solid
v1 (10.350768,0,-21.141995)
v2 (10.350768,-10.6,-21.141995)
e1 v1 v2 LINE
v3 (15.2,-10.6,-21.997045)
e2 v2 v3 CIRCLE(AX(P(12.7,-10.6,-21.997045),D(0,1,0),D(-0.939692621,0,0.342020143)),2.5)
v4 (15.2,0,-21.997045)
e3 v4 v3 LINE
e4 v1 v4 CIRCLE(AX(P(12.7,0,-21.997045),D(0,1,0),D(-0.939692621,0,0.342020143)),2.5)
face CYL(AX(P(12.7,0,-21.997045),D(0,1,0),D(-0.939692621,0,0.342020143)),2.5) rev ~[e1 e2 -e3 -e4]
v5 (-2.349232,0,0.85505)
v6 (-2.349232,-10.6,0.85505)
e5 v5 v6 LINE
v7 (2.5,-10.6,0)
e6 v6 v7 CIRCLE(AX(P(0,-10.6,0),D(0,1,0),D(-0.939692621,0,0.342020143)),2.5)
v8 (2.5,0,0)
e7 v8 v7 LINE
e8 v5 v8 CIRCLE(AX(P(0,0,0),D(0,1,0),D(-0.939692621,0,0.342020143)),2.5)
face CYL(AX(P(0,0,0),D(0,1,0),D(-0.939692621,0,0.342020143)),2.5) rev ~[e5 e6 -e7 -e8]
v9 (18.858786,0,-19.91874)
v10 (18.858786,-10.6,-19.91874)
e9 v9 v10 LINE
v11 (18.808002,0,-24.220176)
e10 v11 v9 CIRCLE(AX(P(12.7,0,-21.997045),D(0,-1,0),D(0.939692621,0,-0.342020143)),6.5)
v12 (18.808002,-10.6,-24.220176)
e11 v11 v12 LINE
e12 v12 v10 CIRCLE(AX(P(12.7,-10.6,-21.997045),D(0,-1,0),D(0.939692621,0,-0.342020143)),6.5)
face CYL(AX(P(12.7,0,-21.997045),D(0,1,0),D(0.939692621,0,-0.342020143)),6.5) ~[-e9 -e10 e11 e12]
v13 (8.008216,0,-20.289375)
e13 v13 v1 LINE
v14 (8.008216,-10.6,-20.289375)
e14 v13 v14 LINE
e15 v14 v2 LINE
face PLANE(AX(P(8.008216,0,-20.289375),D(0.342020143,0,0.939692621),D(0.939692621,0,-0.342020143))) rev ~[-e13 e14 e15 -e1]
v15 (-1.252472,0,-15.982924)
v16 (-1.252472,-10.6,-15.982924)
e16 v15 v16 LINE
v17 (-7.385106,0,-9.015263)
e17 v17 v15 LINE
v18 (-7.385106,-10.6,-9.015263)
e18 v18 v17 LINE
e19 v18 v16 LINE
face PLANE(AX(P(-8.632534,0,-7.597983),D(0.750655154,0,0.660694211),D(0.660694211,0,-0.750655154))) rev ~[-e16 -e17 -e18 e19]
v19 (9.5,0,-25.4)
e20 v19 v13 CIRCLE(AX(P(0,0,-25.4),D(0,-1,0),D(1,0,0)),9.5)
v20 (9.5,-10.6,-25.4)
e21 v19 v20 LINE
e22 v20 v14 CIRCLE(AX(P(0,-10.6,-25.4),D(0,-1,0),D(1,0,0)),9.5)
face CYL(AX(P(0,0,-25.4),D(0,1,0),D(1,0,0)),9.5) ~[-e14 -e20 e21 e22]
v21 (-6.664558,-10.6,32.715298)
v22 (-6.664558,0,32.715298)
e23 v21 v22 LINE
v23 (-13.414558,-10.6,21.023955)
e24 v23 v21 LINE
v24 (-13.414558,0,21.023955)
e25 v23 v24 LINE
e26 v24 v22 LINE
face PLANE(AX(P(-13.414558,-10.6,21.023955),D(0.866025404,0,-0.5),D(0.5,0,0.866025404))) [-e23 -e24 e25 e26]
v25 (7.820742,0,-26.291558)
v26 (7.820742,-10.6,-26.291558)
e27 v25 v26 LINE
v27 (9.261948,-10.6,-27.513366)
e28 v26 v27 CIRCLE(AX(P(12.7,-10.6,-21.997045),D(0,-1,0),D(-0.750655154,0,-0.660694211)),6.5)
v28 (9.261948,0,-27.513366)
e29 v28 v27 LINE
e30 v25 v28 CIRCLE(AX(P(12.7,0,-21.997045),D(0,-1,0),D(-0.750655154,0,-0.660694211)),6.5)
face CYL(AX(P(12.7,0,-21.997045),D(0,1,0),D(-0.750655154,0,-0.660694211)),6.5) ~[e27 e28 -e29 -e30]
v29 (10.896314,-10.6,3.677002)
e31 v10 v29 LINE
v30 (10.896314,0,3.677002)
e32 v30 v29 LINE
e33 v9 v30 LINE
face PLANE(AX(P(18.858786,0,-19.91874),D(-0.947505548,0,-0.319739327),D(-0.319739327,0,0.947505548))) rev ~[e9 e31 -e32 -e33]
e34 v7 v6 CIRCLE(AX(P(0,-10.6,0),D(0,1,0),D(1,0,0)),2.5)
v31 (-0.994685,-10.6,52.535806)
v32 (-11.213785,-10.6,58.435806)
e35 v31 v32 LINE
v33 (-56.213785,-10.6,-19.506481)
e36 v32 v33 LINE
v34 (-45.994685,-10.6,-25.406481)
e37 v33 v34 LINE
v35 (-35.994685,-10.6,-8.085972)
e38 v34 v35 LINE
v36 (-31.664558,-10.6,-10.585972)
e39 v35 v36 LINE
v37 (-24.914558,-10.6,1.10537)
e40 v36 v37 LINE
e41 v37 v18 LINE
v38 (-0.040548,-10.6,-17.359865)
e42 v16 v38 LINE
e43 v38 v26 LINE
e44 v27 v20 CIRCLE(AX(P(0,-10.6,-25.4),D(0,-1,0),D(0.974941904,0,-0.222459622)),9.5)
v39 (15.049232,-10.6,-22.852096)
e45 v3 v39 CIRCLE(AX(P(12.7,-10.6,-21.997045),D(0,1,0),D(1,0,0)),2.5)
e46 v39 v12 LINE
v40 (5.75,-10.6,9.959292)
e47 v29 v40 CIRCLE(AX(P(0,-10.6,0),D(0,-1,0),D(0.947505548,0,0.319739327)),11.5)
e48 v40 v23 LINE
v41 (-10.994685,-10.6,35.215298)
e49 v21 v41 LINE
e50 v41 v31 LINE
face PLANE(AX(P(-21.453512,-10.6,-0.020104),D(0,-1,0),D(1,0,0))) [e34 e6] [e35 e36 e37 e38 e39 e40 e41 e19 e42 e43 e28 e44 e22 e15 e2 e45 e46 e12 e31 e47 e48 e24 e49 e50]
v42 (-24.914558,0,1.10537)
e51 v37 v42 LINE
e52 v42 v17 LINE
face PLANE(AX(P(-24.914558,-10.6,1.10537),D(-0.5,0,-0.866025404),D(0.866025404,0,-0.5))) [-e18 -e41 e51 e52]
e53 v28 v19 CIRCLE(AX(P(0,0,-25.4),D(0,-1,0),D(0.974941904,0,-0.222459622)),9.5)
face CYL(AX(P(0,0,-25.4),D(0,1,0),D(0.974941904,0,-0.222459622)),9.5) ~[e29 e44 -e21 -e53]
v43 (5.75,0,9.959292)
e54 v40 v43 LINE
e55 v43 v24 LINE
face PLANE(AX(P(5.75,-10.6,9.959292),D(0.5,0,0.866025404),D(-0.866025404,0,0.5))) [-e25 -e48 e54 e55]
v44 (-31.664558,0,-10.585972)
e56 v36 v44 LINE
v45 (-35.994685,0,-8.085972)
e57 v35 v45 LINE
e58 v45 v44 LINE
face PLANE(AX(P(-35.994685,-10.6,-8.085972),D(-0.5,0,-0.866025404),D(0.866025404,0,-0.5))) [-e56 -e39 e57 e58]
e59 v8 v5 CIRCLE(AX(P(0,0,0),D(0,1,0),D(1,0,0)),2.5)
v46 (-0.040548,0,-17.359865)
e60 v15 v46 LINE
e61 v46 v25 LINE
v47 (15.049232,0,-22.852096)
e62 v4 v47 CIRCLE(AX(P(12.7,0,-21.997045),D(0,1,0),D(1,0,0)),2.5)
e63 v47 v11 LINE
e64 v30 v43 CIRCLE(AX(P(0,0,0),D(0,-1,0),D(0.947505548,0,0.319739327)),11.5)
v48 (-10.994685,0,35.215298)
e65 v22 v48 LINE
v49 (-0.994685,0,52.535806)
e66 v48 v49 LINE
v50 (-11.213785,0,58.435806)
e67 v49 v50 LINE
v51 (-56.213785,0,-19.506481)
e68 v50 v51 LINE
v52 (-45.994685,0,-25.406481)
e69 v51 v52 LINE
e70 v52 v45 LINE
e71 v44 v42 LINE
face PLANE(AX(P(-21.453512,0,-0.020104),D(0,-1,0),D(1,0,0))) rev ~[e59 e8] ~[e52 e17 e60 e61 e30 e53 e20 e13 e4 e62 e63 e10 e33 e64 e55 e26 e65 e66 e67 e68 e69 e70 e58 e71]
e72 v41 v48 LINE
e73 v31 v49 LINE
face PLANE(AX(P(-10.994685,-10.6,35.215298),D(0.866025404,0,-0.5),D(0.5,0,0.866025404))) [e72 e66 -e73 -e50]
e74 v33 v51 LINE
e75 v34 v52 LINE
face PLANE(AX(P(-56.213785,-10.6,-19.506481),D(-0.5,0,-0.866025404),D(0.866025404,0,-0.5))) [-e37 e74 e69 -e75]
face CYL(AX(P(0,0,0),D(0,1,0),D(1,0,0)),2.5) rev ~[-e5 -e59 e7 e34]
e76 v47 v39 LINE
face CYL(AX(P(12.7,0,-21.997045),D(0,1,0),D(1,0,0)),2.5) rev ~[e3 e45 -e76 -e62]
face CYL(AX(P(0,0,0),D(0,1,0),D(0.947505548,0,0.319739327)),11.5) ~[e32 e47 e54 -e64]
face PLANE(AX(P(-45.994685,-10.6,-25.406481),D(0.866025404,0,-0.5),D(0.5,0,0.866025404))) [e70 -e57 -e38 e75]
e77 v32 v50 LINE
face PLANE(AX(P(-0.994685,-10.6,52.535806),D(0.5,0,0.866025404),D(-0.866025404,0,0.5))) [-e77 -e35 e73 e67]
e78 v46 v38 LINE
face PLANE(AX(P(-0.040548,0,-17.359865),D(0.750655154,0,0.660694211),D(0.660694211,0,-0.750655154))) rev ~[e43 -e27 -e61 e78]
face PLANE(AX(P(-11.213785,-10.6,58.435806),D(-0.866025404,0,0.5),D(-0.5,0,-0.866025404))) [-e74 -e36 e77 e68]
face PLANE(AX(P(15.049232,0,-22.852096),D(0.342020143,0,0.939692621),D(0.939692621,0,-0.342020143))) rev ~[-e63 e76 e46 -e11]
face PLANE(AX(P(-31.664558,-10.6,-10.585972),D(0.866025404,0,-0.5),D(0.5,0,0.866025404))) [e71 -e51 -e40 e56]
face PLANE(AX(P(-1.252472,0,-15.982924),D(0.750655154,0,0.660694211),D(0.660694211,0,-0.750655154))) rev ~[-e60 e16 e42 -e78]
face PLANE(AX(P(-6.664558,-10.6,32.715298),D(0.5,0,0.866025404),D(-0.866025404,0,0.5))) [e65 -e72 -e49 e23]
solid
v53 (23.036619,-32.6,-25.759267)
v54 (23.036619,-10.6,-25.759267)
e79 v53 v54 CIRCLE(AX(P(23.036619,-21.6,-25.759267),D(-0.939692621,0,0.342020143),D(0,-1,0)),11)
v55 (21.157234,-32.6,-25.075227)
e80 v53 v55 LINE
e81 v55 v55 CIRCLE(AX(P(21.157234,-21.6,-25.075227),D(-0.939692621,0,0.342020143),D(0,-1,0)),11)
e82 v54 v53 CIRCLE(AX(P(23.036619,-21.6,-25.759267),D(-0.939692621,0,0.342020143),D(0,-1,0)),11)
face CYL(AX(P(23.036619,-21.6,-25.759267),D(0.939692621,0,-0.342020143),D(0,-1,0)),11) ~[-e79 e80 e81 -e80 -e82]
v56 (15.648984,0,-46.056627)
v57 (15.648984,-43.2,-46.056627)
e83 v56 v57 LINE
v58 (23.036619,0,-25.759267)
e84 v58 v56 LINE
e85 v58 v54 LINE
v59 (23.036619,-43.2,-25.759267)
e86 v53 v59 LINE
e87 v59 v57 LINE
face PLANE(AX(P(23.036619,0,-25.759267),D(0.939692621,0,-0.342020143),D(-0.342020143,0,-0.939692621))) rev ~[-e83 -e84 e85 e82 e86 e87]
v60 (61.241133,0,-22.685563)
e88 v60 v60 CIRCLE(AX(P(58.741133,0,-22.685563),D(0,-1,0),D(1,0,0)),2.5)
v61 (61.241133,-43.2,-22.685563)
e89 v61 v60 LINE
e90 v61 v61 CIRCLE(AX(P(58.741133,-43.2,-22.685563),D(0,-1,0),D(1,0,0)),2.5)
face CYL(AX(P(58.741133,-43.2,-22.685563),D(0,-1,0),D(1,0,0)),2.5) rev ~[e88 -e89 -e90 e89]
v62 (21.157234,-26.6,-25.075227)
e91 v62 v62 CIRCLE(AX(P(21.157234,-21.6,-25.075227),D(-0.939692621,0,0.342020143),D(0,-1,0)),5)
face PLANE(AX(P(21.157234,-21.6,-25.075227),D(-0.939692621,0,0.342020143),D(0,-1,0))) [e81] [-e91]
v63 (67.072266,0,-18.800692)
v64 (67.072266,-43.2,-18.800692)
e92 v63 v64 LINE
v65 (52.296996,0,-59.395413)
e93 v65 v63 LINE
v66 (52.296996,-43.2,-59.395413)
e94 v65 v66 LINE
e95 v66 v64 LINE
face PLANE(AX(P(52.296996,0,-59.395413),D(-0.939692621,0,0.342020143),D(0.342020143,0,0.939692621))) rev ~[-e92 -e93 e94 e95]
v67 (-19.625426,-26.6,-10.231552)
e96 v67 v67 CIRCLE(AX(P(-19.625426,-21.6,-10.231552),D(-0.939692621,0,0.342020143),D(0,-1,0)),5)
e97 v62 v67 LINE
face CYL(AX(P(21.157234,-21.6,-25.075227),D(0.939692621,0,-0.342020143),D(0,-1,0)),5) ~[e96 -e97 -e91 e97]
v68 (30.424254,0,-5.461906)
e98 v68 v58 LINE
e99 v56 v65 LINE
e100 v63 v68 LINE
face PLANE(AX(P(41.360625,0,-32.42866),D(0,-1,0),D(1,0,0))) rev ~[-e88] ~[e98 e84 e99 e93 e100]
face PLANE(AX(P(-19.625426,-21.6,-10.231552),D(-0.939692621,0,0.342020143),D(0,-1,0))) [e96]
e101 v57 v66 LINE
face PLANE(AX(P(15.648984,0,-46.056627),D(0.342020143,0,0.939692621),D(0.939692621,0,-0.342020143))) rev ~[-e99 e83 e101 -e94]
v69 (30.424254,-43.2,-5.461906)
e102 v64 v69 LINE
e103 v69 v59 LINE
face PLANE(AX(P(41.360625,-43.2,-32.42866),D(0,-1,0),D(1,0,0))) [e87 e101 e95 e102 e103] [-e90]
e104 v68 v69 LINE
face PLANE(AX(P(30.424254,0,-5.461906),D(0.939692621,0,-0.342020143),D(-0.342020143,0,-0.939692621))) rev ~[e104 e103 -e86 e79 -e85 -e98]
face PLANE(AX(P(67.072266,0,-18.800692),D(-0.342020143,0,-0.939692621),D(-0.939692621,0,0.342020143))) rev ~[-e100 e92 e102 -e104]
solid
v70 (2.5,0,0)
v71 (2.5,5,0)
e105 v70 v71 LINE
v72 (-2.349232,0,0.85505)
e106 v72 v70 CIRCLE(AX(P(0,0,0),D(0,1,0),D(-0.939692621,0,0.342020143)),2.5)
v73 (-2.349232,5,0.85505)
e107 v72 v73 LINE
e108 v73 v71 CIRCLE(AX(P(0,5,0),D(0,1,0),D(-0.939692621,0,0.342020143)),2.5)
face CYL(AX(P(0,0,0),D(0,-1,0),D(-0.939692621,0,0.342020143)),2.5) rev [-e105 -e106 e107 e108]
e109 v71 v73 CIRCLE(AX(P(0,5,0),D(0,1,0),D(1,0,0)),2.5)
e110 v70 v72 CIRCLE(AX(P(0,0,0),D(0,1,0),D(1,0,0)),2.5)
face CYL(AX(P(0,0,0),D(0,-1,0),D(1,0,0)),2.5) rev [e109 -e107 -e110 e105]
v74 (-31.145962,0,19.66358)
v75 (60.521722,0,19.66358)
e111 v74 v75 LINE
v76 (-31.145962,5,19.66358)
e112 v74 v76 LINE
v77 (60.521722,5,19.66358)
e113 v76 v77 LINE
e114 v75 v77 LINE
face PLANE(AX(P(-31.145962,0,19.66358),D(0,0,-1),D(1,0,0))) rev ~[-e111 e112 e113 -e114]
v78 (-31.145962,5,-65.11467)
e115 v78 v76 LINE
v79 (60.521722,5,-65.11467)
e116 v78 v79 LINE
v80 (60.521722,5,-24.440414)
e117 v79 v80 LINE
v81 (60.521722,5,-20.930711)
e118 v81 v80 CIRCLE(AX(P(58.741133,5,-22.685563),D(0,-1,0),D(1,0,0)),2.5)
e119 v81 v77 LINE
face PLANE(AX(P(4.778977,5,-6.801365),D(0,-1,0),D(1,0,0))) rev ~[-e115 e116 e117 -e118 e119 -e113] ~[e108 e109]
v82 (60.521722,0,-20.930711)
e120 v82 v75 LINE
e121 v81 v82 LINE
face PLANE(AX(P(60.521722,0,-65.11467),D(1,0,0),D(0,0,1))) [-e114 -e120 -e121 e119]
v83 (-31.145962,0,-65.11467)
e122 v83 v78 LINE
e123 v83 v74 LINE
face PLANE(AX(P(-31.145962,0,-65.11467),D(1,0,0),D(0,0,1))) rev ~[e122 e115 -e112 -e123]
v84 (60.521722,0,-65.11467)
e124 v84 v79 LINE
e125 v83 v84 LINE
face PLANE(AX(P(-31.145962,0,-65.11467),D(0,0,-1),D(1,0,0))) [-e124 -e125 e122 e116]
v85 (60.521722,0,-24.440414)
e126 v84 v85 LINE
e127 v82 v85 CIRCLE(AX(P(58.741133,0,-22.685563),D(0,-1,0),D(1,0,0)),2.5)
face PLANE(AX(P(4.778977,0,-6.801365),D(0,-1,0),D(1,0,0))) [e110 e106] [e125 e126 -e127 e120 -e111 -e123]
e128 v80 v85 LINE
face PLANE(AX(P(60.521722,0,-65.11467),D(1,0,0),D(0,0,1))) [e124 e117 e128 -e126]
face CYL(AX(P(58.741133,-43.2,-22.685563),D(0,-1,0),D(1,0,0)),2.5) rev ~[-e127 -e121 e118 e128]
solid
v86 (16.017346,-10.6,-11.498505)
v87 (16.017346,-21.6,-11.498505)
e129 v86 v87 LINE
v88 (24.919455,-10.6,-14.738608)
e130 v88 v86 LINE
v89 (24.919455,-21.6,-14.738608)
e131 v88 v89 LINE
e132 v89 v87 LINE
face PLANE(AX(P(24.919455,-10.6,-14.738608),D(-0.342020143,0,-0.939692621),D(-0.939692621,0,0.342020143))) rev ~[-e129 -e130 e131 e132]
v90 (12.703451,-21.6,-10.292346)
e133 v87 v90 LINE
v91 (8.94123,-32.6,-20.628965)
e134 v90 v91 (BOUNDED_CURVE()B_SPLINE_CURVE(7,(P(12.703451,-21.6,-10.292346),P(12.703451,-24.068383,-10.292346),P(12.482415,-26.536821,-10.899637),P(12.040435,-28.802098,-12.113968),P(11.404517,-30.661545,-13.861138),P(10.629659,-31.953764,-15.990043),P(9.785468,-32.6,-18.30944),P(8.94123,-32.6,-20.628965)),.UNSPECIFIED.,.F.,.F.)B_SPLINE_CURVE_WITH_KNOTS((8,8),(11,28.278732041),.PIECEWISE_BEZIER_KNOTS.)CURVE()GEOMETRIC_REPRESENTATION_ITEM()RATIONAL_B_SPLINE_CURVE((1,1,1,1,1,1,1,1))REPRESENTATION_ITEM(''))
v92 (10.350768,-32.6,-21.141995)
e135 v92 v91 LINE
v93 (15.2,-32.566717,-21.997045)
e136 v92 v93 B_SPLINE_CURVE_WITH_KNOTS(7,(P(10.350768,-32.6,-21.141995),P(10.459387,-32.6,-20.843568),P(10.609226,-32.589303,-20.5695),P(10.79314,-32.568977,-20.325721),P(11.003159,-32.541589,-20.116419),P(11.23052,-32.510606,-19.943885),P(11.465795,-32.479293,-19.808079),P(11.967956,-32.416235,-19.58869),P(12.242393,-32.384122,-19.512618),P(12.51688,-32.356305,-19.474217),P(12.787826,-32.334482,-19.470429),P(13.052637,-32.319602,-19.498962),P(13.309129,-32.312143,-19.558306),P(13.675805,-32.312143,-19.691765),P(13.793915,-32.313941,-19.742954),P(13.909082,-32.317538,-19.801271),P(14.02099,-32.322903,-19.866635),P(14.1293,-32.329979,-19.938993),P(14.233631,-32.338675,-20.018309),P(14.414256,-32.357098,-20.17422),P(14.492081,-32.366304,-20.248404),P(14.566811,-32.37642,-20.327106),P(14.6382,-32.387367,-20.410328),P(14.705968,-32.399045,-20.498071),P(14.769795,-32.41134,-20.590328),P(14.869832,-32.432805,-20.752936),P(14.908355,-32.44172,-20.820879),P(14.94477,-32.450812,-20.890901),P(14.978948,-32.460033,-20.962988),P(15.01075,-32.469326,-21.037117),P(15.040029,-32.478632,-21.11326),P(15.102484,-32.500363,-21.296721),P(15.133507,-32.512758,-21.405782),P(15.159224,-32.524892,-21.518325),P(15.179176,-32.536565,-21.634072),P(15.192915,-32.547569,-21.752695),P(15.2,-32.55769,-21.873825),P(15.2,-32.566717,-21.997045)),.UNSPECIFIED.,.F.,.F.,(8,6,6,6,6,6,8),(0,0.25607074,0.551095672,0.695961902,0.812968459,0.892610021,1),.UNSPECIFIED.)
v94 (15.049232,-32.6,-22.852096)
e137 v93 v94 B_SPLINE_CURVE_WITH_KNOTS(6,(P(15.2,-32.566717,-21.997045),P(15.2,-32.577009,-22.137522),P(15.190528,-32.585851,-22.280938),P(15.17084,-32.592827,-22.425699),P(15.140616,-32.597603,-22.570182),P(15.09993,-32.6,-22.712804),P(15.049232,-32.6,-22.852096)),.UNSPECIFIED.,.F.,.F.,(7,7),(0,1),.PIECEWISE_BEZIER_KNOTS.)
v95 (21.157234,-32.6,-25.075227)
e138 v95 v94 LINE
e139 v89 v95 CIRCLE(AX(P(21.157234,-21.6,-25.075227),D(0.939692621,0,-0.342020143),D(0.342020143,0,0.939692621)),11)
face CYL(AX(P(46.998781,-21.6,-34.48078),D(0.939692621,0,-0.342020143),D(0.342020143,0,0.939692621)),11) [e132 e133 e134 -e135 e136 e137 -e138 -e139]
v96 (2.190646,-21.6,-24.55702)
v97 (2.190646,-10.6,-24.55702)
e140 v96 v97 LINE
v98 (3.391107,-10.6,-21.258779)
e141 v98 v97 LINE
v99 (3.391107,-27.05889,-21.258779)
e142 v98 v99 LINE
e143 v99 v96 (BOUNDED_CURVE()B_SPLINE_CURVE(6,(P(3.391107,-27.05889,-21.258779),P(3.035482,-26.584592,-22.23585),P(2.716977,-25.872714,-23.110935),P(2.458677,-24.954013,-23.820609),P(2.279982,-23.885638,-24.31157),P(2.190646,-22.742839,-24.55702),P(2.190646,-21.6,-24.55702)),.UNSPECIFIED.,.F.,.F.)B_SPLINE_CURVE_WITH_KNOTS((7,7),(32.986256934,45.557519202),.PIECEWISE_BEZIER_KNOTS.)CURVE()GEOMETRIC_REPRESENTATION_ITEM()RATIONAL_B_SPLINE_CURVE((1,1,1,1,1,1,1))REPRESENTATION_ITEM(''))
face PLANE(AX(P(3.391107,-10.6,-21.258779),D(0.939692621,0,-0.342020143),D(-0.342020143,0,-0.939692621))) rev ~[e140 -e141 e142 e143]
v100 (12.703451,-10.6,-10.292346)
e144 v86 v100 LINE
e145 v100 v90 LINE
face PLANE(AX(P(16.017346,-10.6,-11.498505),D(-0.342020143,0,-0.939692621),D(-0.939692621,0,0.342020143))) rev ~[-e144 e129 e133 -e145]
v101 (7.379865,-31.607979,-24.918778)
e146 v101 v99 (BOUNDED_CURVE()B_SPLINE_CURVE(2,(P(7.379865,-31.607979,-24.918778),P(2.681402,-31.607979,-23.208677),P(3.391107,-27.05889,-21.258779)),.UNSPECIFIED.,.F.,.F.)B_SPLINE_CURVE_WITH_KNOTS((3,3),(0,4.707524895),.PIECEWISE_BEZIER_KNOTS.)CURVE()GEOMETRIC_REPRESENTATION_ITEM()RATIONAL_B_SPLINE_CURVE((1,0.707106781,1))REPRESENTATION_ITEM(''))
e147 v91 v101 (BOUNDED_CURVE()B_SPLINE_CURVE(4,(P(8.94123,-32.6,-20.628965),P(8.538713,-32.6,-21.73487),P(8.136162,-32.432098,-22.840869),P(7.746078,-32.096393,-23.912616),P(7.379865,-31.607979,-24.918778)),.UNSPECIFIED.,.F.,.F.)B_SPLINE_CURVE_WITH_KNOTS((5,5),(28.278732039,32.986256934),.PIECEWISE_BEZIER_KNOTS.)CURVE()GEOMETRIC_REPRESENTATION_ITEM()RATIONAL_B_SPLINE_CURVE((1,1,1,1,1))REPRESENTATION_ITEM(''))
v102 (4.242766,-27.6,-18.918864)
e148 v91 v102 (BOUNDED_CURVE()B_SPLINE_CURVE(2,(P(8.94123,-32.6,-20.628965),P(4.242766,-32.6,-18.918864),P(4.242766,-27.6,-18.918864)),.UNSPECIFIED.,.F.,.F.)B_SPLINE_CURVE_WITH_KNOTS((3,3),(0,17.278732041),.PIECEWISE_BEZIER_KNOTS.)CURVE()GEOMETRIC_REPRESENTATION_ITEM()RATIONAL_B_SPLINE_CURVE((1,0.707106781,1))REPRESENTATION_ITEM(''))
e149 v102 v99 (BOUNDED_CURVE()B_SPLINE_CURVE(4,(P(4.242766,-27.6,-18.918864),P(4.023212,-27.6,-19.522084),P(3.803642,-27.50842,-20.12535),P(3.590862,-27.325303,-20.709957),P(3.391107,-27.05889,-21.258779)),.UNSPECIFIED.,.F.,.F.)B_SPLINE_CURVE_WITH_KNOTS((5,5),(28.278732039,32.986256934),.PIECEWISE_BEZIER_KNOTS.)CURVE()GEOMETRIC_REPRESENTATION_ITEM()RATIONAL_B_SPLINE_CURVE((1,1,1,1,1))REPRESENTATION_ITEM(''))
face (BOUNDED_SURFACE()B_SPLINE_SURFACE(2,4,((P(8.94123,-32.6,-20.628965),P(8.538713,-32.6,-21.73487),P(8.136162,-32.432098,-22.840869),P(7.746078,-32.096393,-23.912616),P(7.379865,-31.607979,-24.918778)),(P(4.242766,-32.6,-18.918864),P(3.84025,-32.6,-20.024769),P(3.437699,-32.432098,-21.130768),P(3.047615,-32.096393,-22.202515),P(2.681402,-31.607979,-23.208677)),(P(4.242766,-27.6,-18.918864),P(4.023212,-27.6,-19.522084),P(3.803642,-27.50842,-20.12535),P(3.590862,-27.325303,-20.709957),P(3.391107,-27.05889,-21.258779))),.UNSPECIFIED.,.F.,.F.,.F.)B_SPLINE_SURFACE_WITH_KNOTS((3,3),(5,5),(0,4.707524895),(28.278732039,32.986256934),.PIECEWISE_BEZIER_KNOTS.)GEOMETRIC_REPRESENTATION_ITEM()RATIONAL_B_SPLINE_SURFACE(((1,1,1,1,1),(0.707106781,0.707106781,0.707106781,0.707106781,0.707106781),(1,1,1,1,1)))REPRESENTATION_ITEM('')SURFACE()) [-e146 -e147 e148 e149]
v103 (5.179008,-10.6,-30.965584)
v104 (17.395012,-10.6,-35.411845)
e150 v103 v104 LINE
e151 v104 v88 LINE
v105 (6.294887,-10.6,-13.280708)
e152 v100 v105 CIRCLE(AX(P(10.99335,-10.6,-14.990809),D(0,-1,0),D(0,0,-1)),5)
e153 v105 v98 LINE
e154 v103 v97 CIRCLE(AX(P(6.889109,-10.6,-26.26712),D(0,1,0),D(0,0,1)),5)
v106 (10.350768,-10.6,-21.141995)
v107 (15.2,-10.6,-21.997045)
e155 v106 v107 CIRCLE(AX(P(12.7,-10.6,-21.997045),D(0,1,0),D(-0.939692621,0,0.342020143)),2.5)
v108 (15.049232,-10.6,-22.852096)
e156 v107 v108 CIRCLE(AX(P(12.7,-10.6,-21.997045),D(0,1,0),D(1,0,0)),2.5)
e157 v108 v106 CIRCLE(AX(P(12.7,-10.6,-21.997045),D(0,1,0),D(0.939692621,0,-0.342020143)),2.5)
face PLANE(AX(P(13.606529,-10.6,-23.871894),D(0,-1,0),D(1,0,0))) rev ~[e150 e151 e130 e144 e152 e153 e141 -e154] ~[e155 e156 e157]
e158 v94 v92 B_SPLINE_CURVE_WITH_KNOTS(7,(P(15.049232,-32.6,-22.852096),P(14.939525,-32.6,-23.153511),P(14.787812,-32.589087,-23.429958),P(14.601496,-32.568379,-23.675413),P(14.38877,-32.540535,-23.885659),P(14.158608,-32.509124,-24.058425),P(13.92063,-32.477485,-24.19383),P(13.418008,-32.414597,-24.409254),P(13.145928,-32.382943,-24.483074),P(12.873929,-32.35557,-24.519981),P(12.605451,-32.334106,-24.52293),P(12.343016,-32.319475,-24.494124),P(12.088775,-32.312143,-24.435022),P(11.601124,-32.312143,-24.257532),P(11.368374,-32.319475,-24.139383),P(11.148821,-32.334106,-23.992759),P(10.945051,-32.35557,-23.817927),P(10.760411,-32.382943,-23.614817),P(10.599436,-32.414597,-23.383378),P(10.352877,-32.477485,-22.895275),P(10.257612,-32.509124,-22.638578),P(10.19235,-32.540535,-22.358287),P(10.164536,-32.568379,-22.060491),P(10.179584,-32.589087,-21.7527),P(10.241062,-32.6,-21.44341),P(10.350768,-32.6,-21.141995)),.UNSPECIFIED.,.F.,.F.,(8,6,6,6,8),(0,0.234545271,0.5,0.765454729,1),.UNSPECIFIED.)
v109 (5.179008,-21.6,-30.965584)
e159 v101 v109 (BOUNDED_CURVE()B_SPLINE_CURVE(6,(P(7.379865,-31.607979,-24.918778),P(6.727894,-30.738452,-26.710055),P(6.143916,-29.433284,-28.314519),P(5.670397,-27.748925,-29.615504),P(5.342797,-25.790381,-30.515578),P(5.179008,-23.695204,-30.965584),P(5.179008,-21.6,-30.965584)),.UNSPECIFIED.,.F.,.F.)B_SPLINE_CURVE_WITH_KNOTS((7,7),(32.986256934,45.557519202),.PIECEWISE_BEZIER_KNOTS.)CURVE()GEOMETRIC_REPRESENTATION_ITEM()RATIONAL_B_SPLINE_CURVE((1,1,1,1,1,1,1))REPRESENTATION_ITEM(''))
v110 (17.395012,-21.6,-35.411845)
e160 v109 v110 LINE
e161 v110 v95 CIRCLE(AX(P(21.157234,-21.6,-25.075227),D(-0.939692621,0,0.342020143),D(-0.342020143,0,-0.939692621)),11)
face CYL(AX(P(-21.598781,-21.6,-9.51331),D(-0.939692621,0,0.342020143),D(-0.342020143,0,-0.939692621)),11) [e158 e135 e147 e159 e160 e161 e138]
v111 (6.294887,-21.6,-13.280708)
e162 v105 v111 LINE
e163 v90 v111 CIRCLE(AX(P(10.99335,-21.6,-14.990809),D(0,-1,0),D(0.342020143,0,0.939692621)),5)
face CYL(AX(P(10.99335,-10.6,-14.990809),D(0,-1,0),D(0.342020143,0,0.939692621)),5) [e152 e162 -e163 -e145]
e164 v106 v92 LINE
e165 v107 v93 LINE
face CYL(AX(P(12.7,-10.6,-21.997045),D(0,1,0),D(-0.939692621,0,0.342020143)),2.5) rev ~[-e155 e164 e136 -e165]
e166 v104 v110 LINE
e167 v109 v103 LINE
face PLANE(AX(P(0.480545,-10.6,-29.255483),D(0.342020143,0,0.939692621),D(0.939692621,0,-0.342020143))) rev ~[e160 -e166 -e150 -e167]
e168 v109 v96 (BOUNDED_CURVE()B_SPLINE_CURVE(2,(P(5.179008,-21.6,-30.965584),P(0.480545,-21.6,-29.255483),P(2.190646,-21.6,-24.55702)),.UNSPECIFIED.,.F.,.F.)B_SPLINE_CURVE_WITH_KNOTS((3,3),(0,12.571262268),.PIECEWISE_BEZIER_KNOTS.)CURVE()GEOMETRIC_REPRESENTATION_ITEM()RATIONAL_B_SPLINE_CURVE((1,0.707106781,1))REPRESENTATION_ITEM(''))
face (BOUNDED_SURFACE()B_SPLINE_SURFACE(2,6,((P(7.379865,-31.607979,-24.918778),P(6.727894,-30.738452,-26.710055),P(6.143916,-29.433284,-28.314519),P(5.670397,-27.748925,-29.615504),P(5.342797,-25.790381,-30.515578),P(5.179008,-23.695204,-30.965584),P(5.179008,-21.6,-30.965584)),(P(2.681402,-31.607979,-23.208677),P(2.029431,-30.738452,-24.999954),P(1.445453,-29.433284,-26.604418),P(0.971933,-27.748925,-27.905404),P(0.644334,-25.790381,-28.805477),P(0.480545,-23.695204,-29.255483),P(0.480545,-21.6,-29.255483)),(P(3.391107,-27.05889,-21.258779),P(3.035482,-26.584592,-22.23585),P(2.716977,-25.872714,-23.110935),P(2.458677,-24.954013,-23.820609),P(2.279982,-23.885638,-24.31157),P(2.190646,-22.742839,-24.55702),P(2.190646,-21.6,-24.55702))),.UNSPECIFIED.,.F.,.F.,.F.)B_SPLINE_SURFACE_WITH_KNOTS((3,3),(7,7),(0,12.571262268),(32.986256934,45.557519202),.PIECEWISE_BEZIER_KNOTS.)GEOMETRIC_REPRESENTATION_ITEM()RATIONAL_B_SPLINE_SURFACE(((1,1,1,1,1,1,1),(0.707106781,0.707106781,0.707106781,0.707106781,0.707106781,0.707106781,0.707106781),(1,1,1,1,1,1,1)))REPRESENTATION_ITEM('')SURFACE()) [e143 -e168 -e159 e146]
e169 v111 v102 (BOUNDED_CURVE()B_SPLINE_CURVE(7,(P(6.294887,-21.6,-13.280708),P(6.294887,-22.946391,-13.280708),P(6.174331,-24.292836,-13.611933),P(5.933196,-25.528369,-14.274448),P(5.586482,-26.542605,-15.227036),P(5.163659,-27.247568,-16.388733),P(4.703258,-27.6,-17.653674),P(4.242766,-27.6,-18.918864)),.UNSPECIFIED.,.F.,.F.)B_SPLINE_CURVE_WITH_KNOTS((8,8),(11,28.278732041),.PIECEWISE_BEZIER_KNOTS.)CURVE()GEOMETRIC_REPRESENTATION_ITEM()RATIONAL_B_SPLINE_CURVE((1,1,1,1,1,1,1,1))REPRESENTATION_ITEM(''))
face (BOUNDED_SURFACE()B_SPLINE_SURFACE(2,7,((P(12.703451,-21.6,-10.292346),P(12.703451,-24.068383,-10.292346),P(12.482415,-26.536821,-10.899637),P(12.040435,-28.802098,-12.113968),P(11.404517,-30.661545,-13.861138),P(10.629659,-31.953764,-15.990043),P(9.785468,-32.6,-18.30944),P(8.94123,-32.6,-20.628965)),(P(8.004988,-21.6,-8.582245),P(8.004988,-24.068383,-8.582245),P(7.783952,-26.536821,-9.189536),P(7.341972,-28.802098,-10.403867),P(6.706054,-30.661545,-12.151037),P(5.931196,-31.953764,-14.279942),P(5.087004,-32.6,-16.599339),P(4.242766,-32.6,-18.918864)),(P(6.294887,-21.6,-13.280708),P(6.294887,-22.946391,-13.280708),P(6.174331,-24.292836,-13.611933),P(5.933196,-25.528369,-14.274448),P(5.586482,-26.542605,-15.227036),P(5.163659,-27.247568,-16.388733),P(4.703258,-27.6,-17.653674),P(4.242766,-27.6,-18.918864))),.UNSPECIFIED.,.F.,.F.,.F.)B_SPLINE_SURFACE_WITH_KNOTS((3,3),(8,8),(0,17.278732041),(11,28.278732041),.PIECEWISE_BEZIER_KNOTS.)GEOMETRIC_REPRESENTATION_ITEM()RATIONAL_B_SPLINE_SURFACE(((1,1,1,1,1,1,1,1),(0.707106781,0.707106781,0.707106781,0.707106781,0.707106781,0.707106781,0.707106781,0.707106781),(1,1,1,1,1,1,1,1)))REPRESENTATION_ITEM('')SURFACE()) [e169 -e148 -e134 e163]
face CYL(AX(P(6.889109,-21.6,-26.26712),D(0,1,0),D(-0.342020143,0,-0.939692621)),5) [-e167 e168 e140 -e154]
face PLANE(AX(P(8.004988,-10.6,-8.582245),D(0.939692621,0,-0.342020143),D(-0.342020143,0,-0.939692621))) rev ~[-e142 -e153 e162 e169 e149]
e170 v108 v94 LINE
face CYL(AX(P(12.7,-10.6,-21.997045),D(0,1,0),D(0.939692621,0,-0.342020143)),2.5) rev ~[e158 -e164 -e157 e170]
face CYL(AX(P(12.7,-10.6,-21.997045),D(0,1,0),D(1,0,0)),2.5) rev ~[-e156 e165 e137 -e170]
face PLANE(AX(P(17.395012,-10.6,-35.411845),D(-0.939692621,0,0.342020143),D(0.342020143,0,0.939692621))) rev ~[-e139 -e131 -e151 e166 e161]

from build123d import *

# Parameters (mm, degrees)
F1_DEPTH    = 10.6
F2_DEPTH    = 43.2
F3_R        = 11
F4_DEPTH    = 2
F5_R        = 5
F6_DEPTH    = 43.4
F8_DEPTH    = 22
F9_T1_DEPTH = 73
F9_T3_DEPTH = 73
F10_W       = 91.6676837951
F10_H       = 84.7782492638
F11_DEPTH   = 5
F12_R       = 2.5
F13_DEPTH   = 74.8
F15_DEPTH   = 10.6
F16_R       = 5


# Not quite as in the source:
# - a fillet or chamfer that OpenCascade refuses, or shapes differently, is made with other operations: its cross-section is extruded or revolved along the edge and cut away or added
# - a feature names something its author has since deleted; it is built from what else it names


with BuildPart() as f1:
    # F0 (on Front) → F1 (new body)
    with BuildSketch(Plane.XZ):
        with BuildLine():
            Line((18.8587860588, -19.9187396285), (10.8963137964, 3.6770022643))
            ThreePointArc((10.8963137964, 3.6770022643), (0.1357629169, 11.4991985995), (-10.806465139, 3.9332316482))
            ThreePointArc((-10.806465139, 3.9332316482), (-11.3009249511, -2.1305152546), (-8.6325342688, -7.5979834231))
            Line((-8.6325342688, -7.5979834231), (-1.2524718249, -15.9829243219))
            ThreePointArc((-1.2524718249, -15.9829243219), (4.0057955945, -16.7858487559), (8.0082155178, -20.289375359))
            Line((8.0082155178, -20.289375359), (10.350768448, -21.1419948978))
            ThreePointArc((10.350768448, -21.1419948978), (13.1341204442, -19.5350258736), (15.2, -21.9970452561))
            ThreePointArc((15.2, -21.9970452561), (15.1620193825, -22.4311657003), (15.049231552, -22.8520956144))
            Line((15.049231552, -22.8520956144), (18.8080020351, -24.2201761877))
            ThreePointArc((18.8080020351, -24.2201761877), (19.1995470345, -22.0737808179), (18.8587860588, -19.9187396285))
        make_face()
        with BuildLine():
            ThreePointArc((2.5, 0), (-0.4341204442, -2.4620193825), (-2.349231552, 0.8550503583))
            ThreePointArc((-2.349231552, 0.8550503583), (0.4341204442, 2.4620193825), (2.5, 0))
        make_face(mode=Mode.SUBTRACT)
        with BuildLine():
            ThreePointArc((8.0082155178, -20.289375359), (4.0057955945, -16.7858487559), (-1.2524718249, -15.9829243219))
            Line((-1.2524718249, -15.9829243219), (-0.0405482356, -17.3598649301))
            Line((-0.0405482356, -17.3598649301), (8.0082155178, -20.289375359))
        make_face()
        with BuildLine():
            ThreePointArc((7.8207415002, -26.2915576257), (8.4967135133, -26.9551076509), (9.2619480899, -27.5133664092))
            ThreePointArc((9.2619480899, -27.5133664092), (9.4402994352, -26.4633656816), (9.5, -25.4))
            ThreePointArc((9.5, -25.4), (9.1194311067, -22.738050284), (8.0082155178, -20.289375359))
            Line((8.0082155178, -20.289375359), (-0.0405482356, -17.3598649301))
            Line((-0.0405482356, -17.3598649301), (7.8207415002, -26.2915576257))
        make_face()
    extrude(amount=F1_DEPTH)

    # F14 (on face) → F15 (join)
    with BuildSketch(Plane.XZ.offset(10.6)):
        with BuildLine():
            Line((-31.664557856, -10.5859724576), (-24.914557856, 1.1053704935))
            Line((-24.914557856, 1.1053704935), (-7.3851056739, -9.0152634426))
            Line((-7.3851056739, -9.0152634426), (-8.6325342688, -7.5979834231))
            ThreePointArc((-8.6325342688, -7.5979834231), (-11.4436081592, -1.137467493), (-9.9592921435, 5.75))
            Line((-9.9592921435, 5.75), (-23.4946848749, 13.564662637))
            Line((-23.4946848749, 13.564662637), (-35.9946848749, -8.0859724576))
            Line((-35.9946848749, -8.0859724576), (-31.664557856, -10.5859724576))
        make_face()
        with BuildLine():
            Line((-17.7446848749, 23.5239547806), (-23.4946848749, 13.564662637))
            Line((-23.4946848749, 13.564662637), (-9.9592921435, 5.75))
            ThreePointArc((-9.9592921435, 5.75), (-2.9764190187, 11.1081470023), (5.75, 9.9592921435))
            Line((5.75, 9.9592921435), (-13.414557856, 21.0239547806))
            Line((-13.414557856, 21.0239547806), (-6.664557856, 32.7152977317))
            Line((-6.664557856, 32.7152977317), (-10.9946848749, 35.2152977317))
            Line((-10.9946848749, 35.2152977317), (-17.7446848749, 23.5239547806))
        make_face()
        Polygon((-41.6238499995, -4.8359724576), (-35.9946848749, -8.0859724576), (-23.4946848749, 13.564662637), (-17.7446848749, 23.5239547806), (-10.9946848749, 35.2152977317), (-16.6238499995, 38.4652977317), align=None)
        Polygon((-45.9946848749, -25.4064805333), (-35.9946848749, -8.0859724576), (-41.6238499995, -4.8359724576), (-16.6238499995, 38.4652977317), (-10.9946848749, 35.2152977317), (-0.9946848749, 52.5358058073), (-11.2137846395, 58.4358058073), (-56.2137846395, -19.5064805333), align=None)
    extrude(amount=-F15_DEPTH)


with BuildPart() as f2:
    # F0 (on Front) → F2 (new body)
    with BuildSketch(Plane.XZ):
        Polygon((30.4242539245, -5.4619062237), (23.0366188286, -25.7592668327), (15.6489837328, -46.0566274417), (52.2969959435, -59.3954130314), (67.0722661351, -18.8006918134), align=None)
    extrude(amount=F2_DEPTH)

    # F3 (on face) → F4 (join)
    with BuildSketch(Plane(origin=(28.6207151126, 0, -10.4170883844), x_dir=(0, -1, 0), z_dir=(-0.9396926208, 0, 0.3420201433))):
        with Locations((21.6, -16.326805286)):
            Circle(F3_R)
    extrude(amount=F4_DEPTH)

    # F5 (on face) → F6 (join)
    with BuildSketch(Plane(origin=(26.7413298711, 0, -9.7330480978), x_dir=(0, -1, 0), z_dir=(-0.9396926208, 0, 0.3420201433))):
        with Locations((21.6, -16.326805286)):
            Circle(F5_R)
    extrude(amount=F6_DEPTH)


with BuildPart() as f8:
    # F7 (on face) → F8 (new body)
    with BuildSketch(Plane.XZ.offset(10.6)):
        with BuildLine():
            ThreePointArc((15.049231552, -22.8520956144), (11.8449496417, -24.3462768081), (10.350768448, -21.1419948978))
            Line((10.350768448, -21.1419948978), (8.0082155178, -20.289375359))
            ThreePointArc((8.0082155178, -20.289375359), (9.3600827685, -23.7755460709), (9.2619480899, -27.5133664092))
            ThreePointArc((9.2619480899, -27.5133664092), (8.4967135133, -26.9551076509), (7.8207415002, -26.2915576257))
            Line((7.8207415002, -26.2915576257), (3.3911070963, -21.2587787078))
            Line((3.3911070963, -21.2587787078), (0.4805448363, -29.2554827948))
            Line((0.4805448363, -29.2554827948), (17.3950120105, -35.4118453747))
            Line((17.3950120105, -35.4118453747), (24.9194551637, -14.7386077174))
            Line((24.9194551637, -14.7386077174), (16.0173460598, -11.4985049814))
            Line((16.0173460598, -11.4985049814), (18.8587860588, -19.9187396285))
            ThreePointArc((18.8587860588, -19.9187396285), (19.1995470345, -22.0737808179), (18.8080020351, -24.2201761877))
            Line((18.8080020351, -24.2201761877), (15.049231552, -22.8520956144))
        make_face()
        with BuildLine():
            ThreePointArc((10.350768448, -21.1419948978), (13.1341204442, -19.5350258736), (15.2, -21.9970452561))
            ThreePointArc((15.2, -21.9970452561), (15.1620193825, -22.4311657003), (15.049231552, -22.8520956144))
            Line((15.049231552, -22.8520956144), (18.8080020351, -24.2201761877))
            ThreePointArc((18.8080020351, -24.2201761877), (19.1995470345, -22.0737808179), (18.8587860588, -19.9187396285))
            Line((18.8587860588, -19.9187396285), (16.0173460598, -11.4985049814))
            Line((16.0173460598, -11.4985049814), (8.0049879895, -8.5822451375))
            Line((8.0049879895, -8.5822451375), (3.3911070963, -21.2587787078))
            Line((3.3911070963, -21.2587787078), (7.8207415002, -26.2915576257))
            ThreePointArc((7.8207415002, -26.2915576257), (8.4967135133, -26.9551076509), (9.2619480899, -27.5133664092))
            ThreePointArc((9.2619480899, -27.5133664092), (9.3600827685, -23.7755460709), (8.0082155178, -20.289375359))
            Line((8.0082155178, -20.289375359), (10.350768448, -21.1419948978))
        make_face()
    extrude(amount=F8_DEPTH)

    # F9: fillet of radius 11 on 2 edges, made by hand

    # F9_s2 → F9_t1 (cut)
    with BuildSketch(Plane(origin=(52.5828769427, 0, -19.1386020392), x_dir=(0, 1, 0), z_dir=(-0.9396926208, 0, 0.3420201433))):
        with BuildLine():
            ThreePointArc((-21.6, 5.326805286), (-29.3781745931, 8.548630693), (-32.6, 16.326805286))
            Line((-32.6, 16.326805286), (-32.6, 5.326805286))
            Line((-32.6, 5.326805286), (-21.6, 5.326805286))
        make_face()
    extrude(amount=F9_T1_DEPTH, mode=Mode.SUBTRACT)

    # F9_s4 → F9_t3 (cut)
    with BuildSketch(Plane(origin=(-16.0146843747, 0, 5.8288684236), x_dir=(0, 1, 0), z_dir=(0.9396926208, 0, -0.3420201433))):
        with BuildLine():
            ThreePointArc((-21.6, -27.326805286), (-29.3781745931, -24.1049798791), (-32.6, -16.326805286))
            Line((-32.6, -16.326805286), (-32.6, -27.326805286))
            Line((-32.6, -27.326805286), (-21.6, -27.326805286))
        make_face()
    extrude(amount=F9_T3_DEPTH, mode=Mode.SUBTRACT)

    # F16
    f16_edges = [f8.edges().sort_by_distance(p)[0] for p in [
        (6.903059, -29.378175, -11.609771),
        (0.480545, -16.1, -29.255483),
        (1.582474, -29.378175, -26.227957),
        (8.004988, -16.1, -8.582245),
    ]]
    fillet(f16_edges, radius=F16_R)


with BuildPart() as f11:
    # F10 (on face) → F11 (new body)
    with BuildSketch(Plane.XZ):
        with Locations((14.6878799424, -22.7255448699)):
            Rectangle(F10_W, F10_H)
        with BuildLine():
            Line((10.8963137964, 3.6770022643), (18.8587860588, -19.9187396285))
            ThreePointArc((18.8587860588, -19.9187396285), (19.1995470345, -22.0737808179), (18.8080020351, -24.2201761877))
            Line((18.8080020351, -24.2201761877), (15.049231552, -22.8520956144))
            ThreePointArc((15.049231552, -22.8520956144), (15.1620193825, -22.4311657003), (15.2, -21.9970452561))
            ThreePointArc((15.2, -21.9970452561), (13.1341204442, -19.5350258736), (10.350768448, -21.1419948978))
            Line((10.350768448, -21.1419948978), (8.0082155178, -20.289375359))
            ThreePointArc((8.0082155178, -20.289375359), (4.0057955945, -16.7858487559), (-1.2524718249, -15.9829243219))
            Line((-1.2524718249, -15.9829243219), (-8.6325342688, -7.5979834231))
            ThreePointArc((-8.6325342688, -7.5979834231), (-11.3009249511, -2.1305152546), (-10.806465139, 3.9332316482))
            ThreePointArc((-10.806465139, 3.9332316482), (0.1357629169, 11.4991985995), (10.8963137964, 3.6770022643))
        make_face(mode=Mode.SUBTRACT)
    extrude(amount=-F11_DEPTH)

    # F0 (on Front) → F11, piece 2 (join)
    with BuildSketch(Plane.XZ):
        with BuildLine():
            Line((18.8587860588, -19.9187396285), (10.8963137964, 3.6770022643))
            ThreePointArc((10.8963137964, 3.6770022643), (0.1357629169, 11.4991985995), (-10.806465139, 3.9332316482))
            ThreePointArc((-10.806465139, 3.9332316482), (-11.3009249511, -2.1305152546), (-8.6325342688, -7.5979834231))
            Line((-8.6325342688, -7.5979834231), (-1.2524718249, -15.9829243219))
            ThreePointArc((-1.2524718249, -15.9829243219), (4.0057955945, -16.7858487559), (8.0082155178, -20.289375359))
            Line((8.0082155178, -20.289375359), (10.350768448, -21.1419948978))
            ThreePointArc((10.350768448, -21.1419948978), (13.1341204442, -19.5350258736), (15.2, -21.9970452561))
            ThreePointArc((15.2, -21.9970452561), (15.1620193825, -22.4311657003), (15.049231552, -22.8520956144))
            Line((15.049231552, -22.8520956144), (18.8080020351, -24.2201761877))
            ThreePointArc((18.8080020351, -24.2201761877), (19.1995470345, -22.0737808179), (18.8587860588, -19.9187396285))
        make_face()
        with BuildLine():
            ThreePointArc((2.5, 0), (-0.4341204442, -2.4620193825), (-2.349231552, 0.8550503583))
            ThreePointArc((-2.349231552, 0.8550503583), (0.4341204442, 2.4620193825), (2.5, 0))
        make_face(mode=Mode.SUBTRACT)
        with BuildLine():
            ThreePointArc((10.350768448, -21.1419948978), (11.8449496417, -24.3462768081), (15.049231552, -22.8520956144))
            Line((15.049231552, -22.8520956144), (10.350768448, -21.1419948978))
        make_face()
        with BuildLine():
            Line((10.350768448, -21.1419948978), (15.049231552, -22.8520956144))
            ThreePointArc((15.049231552, -22.8520956144), (15.1620193825, -22.4311657003), (15.2, -21.9970452561))
            ThreePointArc((15.2, -21.9970452561), (13.1341204442, -19.5350258736), (10.350768448, -21.1419948978))
        make_face()
    extrude(amount=-F11_DEPTH)


with BuildPart() as f13_tool:
    # F12 (on face) → F13 (new body)
    with BuildSketch(Plane.XZ.offset(43.2)):
        with Locations((58.7411331684, -22.6855629169)):
            Circle(F12_R)
    extrude(amount=-F13_DEPTH)


with BuildPart() as f2_1:
    add(f2.part)

    # F13: cut by f13_tool
    add(f13_tool.part, mode=Mode.SUBTRACT)


with BuildPart() as f11_1:
    add(f11.part)

    # F13: cut by f13_tool
    add(f13_tool.part, mode=Mode.SUBTRACT)


solid = Compound([f1.part, f8.part, f2_1.part, f11_1.part])
